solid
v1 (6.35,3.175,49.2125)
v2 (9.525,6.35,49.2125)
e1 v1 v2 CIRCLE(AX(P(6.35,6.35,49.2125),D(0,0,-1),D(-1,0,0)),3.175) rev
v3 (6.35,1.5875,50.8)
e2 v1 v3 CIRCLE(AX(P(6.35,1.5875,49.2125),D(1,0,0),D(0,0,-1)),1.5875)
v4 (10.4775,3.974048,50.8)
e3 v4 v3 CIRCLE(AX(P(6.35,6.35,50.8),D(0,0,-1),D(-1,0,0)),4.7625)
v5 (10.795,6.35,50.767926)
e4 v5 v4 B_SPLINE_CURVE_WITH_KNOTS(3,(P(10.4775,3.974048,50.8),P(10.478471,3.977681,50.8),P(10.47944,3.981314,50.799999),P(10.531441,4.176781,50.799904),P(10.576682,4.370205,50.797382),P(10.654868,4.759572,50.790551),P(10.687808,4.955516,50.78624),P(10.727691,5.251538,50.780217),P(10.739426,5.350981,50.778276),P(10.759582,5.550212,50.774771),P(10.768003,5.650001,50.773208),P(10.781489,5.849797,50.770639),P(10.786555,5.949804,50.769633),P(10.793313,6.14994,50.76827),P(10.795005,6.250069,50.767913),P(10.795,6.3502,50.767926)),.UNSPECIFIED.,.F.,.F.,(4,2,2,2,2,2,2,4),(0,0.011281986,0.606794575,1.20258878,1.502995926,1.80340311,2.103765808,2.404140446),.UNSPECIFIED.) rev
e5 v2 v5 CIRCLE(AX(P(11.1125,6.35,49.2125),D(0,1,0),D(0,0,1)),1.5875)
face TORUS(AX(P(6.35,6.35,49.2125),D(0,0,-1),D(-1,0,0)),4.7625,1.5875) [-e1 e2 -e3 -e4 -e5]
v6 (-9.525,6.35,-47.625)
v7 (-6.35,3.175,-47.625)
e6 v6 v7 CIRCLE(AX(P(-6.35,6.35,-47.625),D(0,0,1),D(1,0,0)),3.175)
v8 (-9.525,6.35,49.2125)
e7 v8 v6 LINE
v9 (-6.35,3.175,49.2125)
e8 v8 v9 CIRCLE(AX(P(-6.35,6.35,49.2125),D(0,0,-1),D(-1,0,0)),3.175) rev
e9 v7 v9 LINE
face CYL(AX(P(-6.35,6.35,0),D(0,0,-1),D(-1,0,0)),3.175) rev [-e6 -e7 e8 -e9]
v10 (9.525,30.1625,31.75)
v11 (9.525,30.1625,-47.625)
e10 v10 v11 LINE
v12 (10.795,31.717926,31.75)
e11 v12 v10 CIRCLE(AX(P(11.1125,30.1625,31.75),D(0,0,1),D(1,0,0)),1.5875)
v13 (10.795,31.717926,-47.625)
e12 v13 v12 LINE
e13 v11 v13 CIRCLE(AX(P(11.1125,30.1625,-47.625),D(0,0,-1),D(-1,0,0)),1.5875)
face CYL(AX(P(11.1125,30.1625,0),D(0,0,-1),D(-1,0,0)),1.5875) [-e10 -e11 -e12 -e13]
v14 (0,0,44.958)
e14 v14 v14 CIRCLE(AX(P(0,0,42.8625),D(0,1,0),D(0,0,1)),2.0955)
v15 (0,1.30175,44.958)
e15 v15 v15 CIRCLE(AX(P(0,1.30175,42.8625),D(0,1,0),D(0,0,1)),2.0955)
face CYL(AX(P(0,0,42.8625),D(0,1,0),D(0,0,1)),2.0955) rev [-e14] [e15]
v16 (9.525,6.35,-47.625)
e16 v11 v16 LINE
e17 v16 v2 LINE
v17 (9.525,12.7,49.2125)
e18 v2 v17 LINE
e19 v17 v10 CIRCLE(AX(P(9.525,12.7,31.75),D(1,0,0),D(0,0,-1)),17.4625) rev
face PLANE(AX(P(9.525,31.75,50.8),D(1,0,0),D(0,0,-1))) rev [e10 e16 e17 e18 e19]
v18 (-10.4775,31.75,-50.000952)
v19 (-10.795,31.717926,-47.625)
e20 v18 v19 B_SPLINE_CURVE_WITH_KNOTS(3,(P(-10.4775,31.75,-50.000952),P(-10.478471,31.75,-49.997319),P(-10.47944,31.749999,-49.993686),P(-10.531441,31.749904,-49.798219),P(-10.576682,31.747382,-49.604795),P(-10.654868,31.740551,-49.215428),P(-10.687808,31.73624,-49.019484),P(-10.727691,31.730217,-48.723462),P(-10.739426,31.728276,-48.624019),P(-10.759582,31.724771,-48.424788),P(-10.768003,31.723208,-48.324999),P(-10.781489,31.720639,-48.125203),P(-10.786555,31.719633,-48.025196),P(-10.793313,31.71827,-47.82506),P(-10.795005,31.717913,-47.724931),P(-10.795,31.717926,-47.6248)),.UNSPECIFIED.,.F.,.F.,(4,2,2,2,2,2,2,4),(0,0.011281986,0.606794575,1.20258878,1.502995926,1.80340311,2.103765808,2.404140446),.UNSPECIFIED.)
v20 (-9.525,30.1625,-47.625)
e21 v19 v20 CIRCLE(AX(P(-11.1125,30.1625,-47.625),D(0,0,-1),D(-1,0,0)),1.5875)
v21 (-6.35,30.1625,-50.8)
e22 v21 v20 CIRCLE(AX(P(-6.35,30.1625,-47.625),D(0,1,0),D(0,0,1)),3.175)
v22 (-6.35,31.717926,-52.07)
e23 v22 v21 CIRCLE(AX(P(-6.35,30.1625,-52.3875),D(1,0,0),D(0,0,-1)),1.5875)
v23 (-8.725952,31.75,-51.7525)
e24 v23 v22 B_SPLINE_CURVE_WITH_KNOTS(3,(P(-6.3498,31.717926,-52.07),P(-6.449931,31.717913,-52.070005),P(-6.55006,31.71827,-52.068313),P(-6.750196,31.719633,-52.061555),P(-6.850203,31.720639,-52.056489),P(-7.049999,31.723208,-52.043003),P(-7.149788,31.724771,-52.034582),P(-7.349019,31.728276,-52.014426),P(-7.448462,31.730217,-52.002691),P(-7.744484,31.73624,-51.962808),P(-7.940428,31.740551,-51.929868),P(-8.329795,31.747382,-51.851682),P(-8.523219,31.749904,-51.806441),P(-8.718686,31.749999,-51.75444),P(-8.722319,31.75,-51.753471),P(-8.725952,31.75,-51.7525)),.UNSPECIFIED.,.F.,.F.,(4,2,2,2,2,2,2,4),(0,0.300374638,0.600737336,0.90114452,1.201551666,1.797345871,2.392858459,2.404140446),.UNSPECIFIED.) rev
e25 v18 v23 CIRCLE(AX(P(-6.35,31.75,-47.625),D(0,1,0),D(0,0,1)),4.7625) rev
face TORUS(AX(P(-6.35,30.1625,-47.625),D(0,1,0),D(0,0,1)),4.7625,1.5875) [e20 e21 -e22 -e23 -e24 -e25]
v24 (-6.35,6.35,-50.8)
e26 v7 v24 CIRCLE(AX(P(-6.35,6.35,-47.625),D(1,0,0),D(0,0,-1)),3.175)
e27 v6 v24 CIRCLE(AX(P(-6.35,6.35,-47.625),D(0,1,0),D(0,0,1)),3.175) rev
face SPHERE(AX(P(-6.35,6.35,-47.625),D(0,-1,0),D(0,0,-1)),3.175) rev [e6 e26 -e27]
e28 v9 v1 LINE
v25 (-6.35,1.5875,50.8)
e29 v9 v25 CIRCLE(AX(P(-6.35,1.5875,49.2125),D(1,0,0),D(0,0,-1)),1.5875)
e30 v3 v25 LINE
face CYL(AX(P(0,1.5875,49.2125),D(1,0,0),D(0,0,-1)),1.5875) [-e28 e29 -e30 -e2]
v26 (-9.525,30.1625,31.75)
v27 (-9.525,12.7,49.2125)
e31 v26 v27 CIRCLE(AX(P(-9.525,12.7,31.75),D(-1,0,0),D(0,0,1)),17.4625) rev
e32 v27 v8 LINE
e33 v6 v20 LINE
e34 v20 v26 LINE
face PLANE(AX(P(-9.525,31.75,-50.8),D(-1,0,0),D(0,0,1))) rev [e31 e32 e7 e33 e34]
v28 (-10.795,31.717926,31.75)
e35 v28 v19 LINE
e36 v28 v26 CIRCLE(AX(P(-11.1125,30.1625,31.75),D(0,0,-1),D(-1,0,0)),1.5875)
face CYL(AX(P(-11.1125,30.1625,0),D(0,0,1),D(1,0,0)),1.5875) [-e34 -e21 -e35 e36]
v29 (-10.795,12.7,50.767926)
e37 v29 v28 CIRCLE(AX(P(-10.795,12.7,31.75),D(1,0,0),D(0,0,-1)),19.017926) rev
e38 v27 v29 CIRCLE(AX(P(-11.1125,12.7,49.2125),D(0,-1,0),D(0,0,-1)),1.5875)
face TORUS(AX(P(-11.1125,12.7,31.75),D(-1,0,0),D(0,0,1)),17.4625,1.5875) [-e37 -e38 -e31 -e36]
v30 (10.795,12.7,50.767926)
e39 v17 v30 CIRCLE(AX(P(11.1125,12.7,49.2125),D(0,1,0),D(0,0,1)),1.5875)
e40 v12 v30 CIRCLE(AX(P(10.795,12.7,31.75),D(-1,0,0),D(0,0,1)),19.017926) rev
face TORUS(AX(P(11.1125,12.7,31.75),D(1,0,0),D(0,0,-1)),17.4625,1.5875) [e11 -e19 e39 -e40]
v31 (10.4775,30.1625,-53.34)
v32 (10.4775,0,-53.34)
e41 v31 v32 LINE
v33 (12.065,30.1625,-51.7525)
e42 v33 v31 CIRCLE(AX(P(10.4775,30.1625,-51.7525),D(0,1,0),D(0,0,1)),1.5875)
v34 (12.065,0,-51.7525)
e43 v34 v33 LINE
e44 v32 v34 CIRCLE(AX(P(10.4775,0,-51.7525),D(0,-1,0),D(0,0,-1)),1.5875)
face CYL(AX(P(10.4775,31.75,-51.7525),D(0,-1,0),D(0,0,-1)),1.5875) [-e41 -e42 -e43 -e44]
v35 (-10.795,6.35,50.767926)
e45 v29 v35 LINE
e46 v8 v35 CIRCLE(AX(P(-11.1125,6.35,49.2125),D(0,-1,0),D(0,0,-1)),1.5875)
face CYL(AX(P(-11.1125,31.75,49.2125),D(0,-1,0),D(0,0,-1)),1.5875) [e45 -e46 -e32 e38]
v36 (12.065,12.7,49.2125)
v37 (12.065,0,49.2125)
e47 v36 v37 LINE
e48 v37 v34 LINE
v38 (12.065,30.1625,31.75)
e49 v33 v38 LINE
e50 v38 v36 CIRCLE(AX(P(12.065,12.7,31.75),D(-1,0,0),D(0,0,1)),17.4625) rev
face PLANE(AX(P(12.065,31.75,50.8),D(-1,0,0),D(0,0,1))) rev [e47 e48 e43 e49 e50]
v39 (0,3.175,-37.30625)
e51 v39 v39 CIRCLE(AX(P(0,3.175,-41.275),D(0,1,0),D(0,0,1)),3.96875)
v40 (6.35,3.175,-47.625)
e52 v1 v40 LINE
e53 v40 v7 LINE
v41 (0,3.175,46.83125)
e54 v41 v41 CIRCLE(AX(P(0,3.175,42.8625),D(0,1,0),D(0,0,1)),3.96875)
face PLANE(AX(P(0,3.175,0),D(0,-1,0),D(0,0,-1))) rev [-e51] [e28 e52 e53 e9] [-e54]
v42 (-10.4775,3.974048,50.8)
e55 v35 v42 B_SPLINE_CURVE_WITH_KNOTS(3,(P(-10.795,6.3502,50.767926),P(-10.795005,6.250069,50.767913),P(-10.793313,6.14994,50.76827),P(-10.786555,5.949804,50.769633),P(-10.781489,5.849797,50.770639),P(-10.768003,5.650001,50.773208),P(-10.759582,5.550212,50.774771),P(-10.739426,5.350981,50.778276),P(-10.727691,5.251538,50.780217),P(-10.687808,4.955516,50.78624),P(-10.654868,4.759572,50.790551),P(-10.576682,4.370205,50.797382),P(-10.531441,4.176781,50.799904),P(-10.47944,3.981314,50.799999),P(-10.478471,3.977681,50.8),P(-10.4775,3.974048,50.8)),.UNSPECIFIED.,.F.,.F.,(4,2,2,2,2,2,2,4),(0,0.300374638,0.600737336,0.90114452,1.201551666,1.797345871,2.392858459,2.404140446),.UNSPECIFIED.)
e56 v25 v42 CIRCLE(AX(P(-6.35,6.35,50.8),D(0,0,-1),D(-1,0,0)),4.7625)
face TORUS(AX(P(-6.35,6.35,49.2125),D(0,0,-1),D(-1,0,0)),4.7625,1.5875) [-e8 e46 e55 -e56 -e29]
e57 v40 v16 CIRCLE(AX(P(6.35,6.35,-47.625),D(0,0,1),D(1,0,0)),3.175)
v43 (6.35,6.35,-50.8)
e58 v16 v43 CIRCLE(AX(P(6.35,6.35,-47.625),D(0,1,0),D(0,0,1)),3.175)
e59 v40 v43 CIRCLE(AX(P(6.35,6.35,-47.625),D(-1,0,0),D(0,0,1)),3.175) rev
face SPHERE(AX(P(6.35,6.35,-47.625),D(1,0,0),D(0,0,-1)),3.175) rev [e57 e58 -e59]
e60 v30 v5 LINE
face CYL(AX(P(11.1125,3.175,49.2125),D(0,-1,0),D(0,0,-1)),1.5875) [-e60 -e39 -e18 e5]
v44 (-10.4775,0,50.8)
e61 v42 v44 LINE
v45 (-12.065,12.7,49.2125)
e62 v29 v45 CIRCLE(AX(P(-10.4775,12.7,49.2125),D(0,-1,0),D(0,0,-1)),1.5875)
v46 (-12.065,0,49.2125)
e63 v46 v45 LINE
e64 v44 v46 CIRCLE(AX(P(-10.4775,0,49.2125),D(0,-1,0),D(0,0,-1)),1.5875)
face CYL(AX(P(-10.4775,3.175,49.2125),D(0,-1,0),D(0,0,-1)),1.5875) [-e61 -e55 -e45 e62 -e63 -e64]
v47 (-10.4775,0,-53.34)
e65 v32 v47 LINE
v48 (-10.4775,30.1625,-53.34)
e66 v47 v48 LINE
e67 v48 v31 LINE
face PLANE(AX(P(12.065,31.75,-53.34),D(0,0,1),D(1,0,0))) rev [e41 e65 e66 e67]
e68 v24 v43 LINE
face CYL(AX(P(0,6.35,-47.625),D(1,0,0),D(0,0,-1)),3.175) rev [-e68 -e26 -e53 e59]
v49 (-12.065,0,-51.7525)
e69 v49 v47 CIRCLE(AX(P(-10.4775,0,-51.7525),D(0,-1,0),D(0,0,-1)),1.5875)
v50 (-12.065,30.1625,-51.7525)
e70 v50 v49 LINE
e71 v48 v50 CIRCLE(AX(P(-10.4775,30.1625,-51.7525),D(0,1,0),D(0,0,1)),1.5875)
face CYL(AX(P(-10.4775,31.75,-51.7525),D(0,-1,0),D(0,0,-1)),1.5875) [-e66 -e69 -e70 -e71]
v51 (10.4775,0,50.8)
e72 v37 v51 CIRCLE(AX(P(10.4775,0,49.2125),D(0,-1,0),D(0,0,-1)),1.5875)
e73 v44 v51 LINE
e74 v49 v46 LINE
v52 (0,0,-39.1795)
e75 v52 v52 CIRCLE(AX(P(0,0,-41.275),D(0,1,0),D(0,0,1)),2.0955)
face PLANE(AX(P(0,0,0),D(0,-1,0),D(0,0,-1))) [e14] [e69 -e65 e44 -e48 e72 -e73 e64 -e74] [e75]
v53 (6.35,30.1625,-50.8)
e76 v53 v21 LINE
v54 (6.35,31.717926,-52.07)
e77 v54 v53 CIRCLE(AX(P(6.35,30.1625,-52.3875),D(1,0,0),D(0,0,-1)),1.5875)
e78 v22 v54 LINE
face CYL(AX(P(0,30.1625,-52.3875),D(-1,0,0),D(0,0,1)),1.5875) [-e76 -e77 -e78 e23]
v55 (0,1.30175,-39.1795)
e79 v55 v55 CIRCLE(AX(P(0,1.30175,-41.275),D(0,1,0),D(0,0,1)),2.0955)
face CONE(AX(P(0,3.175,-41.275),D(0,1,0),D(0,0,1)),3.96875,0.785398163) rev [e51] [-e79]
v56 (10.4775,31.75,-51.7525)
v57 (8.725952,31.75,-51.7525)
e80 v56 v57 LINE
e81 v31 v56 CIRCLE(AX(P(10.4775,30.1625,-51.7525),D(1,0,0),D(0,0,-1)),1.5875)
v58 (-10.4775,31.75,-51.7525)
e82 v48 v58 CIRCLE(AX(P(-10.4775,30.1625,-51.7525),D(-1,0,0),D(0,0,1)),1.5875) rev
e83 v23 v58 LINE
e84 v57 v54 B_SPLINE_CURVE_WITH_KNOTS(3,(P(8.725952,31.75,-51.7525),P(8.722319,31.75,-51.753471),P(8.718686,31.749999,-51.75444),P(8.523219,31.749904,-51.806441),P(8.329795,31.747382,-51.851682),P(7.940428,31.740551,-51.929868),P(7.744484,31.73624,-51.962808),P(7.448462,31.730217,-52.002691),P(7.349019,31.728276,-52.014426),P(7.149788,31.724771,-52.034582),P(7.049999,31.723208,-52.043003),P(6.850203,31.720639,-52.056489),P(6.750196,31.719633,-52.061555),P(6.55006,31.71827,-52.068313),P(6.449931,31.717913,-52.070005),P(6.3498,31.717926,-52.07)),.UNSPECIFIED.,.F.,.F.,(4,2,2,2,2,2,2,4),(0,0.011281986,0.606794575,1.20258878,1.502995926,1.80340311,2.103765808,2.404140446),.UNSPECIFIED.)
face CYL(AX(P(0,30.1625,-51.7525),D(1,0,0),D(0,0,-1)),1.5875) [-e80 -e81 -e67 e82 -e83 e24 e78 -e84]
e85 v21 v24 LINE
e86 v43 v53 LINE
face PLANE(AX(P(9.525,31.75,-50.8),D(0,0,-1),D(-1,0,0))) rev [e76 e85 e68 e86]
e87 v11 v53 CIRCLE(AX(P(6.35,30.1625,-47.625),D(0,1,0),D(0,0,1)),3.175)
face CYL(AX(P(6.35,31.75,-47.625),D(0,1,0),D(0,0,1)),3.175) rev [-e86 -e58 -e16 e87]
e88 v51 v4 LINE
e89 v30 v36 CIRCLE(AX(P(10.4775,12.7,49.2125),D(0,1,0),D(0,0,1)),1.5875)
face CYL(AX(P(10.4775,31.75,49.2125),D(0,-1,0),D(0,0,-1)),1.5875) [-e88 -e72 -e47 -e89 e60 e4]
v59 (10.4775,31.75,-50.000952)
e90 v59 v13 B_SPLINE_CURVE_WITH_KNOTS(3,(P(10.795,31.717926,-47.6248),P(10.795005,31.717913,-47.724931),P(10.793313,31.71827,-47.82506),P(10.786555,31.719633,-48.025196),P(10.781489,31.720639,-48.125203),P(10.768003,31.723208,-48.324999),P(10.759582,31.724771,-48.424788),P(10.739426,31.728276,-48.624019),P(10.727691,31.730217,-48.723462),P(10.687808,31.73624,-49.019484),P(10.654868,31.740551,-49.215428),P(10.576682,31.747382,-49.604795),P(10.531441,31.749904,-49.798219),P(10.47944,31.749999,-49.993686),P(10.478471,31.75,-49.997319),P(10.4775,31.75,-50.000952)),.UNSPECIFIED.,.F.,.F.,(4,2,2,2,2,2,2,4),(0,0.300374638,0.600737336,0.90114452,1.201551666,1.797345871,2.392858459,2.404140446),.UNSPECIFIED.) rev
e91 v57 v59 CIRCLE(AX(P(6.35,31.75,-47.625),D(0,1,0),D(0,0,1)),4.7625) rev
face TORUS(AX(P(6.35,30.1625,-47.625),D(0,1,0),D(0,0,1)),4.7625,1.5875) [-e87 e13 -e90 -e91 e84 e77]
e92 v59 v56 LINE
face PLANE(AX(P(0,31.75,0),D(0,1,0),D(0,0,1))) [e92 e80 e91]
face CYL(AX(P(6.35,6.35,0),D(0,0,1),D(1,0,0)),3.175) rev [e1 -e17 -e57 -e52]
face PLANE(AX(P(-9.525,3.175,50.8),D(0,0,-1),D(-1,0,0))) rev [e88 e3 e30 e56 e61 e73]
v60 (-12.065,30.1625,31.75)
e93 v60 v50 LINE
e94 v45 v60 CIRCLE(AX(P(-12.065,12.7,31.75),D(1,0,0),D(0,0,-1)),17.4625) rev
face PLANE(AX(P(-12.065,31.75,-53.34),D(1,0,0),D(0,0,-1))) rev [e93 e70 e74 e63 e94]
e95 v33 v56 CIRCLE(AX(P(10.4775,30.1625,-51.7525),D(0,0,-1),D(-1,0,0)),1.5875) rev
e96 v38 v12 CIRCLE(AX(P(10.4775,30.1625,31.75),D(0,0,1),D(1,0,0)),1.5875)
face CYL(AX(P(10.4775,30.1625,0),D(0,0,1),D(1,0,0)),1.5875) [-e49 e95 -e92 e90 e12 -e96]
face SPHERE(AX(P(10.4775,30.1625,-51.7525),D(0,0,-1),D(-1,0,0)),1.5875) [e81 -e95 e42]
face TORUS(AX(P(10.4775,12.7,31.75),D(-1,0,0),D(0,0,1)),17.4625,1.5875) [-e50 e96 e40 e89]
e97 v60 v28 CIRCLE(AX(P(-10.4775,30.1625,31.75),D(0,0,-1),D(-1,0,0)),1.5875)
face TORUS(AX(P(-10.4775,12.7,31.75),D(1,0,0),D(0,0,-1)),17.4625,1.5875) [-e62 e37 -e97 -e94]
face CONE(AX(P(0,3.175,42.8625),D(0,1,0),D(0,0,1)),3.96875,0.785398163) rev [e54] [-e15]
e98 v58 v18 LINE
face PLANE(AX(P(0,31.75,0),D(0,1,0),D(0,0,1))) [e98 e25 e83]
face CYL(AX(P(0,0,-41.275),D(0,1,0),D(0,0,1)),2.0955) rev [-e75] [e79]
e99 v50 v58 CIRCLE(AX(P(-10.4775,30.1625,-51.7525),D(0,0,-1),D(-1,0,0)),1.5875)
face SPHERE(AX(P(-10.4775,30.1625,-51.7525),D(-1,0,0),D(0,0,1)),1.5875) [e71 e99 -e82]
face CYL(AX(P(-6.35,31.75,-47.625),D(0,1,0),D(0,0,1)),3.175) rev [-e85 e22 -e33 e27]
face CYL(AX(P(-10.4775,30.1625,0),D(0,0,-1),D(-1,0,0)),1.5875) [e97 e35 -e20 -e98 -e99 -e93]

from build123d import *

# Parameters (mm, degrees)
SKETCH1_W           = 19.05
SKETCH1_H           = 101.6
BOSS_EXTRUDE1_DEPTH = 3.175
BOSS_EXTRUDE2_DEPTH = 31.75
FILLET1_R           = 19.05
FILLET2_R           = 3.175
FILLET3_R           = 1.5875
SKETCH3_R           = 2.0955
CUT_EXTRUDE1_DEPTH  = 62.702921072


with BuildPart() as part:
    # Sketch1 → Boss-Extrude1 (new body)
    with BuildSketch(Plane(origin=(0, 0, 0), x_dir=(1, 0, 0), z_dir=(0, 1, 0))):
        Rectangle(SKETCH1_W, SKETCH1_H)
    extrude(amount=BOSS_EXTRUDE1_DEPTH)

    # Sketch2 → Boss-Extrude2 (add)
    with BuildSketch(Plane(origin=(0, 0, 0), x_dir=(1, 0, 0), z_dir=(0, 1, 0))):
        Polygon((-12.065, 53.34), (-12.065, -50.8), (-9.525, -50.8), (-9.525, 50.8), (9.525, 50.8), (9.525, -50.8), (12.065, -50.8), (12.065, 53.34), align=None)
    extrude(amount=BOSS_EXTRUDE2_DEPTH)

    # Fillet1
    fillet1_edges = [part.edges().sort_by_distance(p)[0] for p in [
        (10.795, 31.75, 50.8),
        (-10.795, 31.75, 50.8),
    ]]
    fillet(fillet1_edges, radius=FILLET1_R)

    # Fillet2
    fillet2_edges = [part.edges().sort_by_distance(p)[0] for p in [
        (-9.525, 3.175, 0),
        (-9.525, 17.4625, -50.8),
        (9.525, 17.4625, -50.8),
        (9.525, 3.175, 0),
        (0, 3.175, -50.8),
    ]]
    fillet(fillet2_edges, radius=FILLET2_R)

    # Fillet3
    # the kernel refuses this fillet: 1.5875 mm, written as the material it takes off along each edge
    with BuildSketch(Plane(origin=(-10.4775, 30.1625, -51.7525), x_dir=(-1, 0, 0), z_dir=(0, 1, 0))) as fillet3_piece_1_section:
        Polygon((0, 0), (FILLET3_R, 0), (FILLET3_R, -FILLET3_R), (0, -FILLET3_R), align=None)
    fillet3_piece_1 = extrude(amount=FILLET3_R, mode=Mode.PRIVATE)
    fillet3_piece_1 = fillet3_piece_1 - Plane(origin=(-10.4775, 30.1625, -51.7525), x_dir=(0.7071067811865475, 0, 0.7071067811865475), z_dir=(0, 1, 0)) * Sphere(FILLET3_R, mode=Mode.PRIVATE)
    add(fillet3_piece_1, mode=Mode.SUBTRACT)
    with BuildSketch(Plane(origin=(10.4775, 30.1625, -51.7525), x_dir=(0, 1, 0), z_dir=(1, 0, 0))) as fillet3_piece_2_section:
        Polygon((0, 0), (FILLET3_R, 0), (FILLET3_R, -FILLET3_R), (0, -FILLET3_R), align=None)
    fillet3_piece_2 = extrude(amount=FILLET3_R, mode=Mode.PRIVATE)
    fillet3_piece_2 = fillet3_piece_2 - Plane(origin=(10.4775, 30.1625, -51.7525), x_dir=(0, -0.7071067811865475, 0.7071067811865475), z_dir=(1, 0, 0)) * Sphere(FILLET3_R, mode=Mode.PRIVATE)
    add(fillet3_piece_2, mode=Mode.SUBTRACT)
    with BuildSketch(Plane(origin=(12.065, 12.7, 31.75), x_dir=(0, 0, 1), z_dir=(0, -1, 0))) as fillet3_piece_3:
        with BuildLine():
            CenterArc((19.05 - FILLET3_R, FILLET3_R), FILLET3_R, 270, 90)
            Line((19.05, FILLET3_R), (19.05, 0))
            Line((19.05, 0), (19.05 - FILLET3_R, 0))
        make_face()
    revolve(axis=Axis((12.065, 12.7, 31.75), (-1, 0, 0)), revolution_arc=90, mode=Mode.SUBTRACT)
    with BuildSketch(Plane(origin=(-12.065, 12.7, 31.75), x_dir=(0, 0, 1), z_dir=(0, -1, 0))) as fillet3_piece_4:
        with BuildLine():
            CenterArc((19.05 - FILLET3_R, -FILLET3_R), FILLET3_R, 0, 90)
            Line((19.05 - FILLET3_R, 0), (19.05, 0))
            Line((19.05, 0), (19.05, -FILLET3_R))
        make_face()
    revolve(axis=Axis((-12.065, 12.7, 31.75), (-1, 0, 0)), revolution_arc=90, mode=Mode.SUBTRACT)
    with BuildSketch(Plane(origin=(-9.525, 12.7, 31.75), x_dir=(0, 0, 1), z_dir=(0, -1, 0))) as fillet3_piece_5:
        with BuildLine():
            CenterArc((19.05 - FILLET3_R, FILLET3_R), FILLET3_R, 270, 90)
            Line((19.05, FILLET3_R), (19.05, 0))
            Line((19.05, 0), (19.05 - FILLET3_R, 0))
        make_face()
    revolve(axis=Axis((-9.525, 12.7, 31.75), (-1, 0, 0)), revolution_arc=90, mode=Mode.SUBTRACT)
    with BuildSketch(Plane(origin=(9.525, 12.7, 31.75), x_dir=(0, 0, 1), z_dir=(0, -1, 0))) as fillet3_piece_6:
        with BuildLine():
            CenterArc((19.05 - FILLET3_R, -FILLET3_R), FILLET3_R, 0, 90)
            Line((19.05, -FILLET3_R), (19.05, 0))
            Line((19.05, 0), (19.05 - FILLET3_R, 0))
        make_face()
    revolve(axis=Axis((9.525, 12.7, 31.75), (-1, 0, 0)), revolution_arc=90, mode=Mode.SUBTRACT)
    with BuildSketch(Plane(origin=(9.525, 6.35, 50.8), x_dir=(1, 0, 0), z_dir=(0, 1, 0))) as fillet3_piece_7:
        with BuildLine():
            CenterArc((FILLET3_R, FILLET3_R), FILLET3_R, 180, 90)
            Line((0, FILLET3_R), (0, 0))
            Line((0, 0), (FILLET3_R, 0))
        make_face()
    extrude(amount=6.35, mode=Mode.SUBTRACT)
    with BuildSketch(Plane(origin=(6.35, 6.35, 50.8), x_dir=(0, -1, 0), z_dir=(-1, 0, 0))) as fillet3_piece_8:
        with BuildLine():
            CenterArc((3.175 + FILLET3_R, -FILLET3_R), FILLET3_R, 90, 90)
            Line((3.175, -FILLET3_R), (3.175, 0))
            Line((3.175, 0), (3.175 + FILLET3_R, 0))
        make_face()
    revolve(axis=Axis((6.35, 6.35, 50.8), (0, 0, 1)), revolution_arc=90, mode=Mode.SUBTRACT)
    with BuildSketch(Plane(origin=(-6.35, 3.175, 50.8), x_dir=(0, -1, 0), z_dir=(1, 0, 0))) as fillet3_piece_9:
        with BuildLine():
            CenterArc((FILLET3_R, FILLET3_R), FILLET3_R, 180, 90)
            Line((0, FILLET3_R), (0, 0))
            Line((0, 0), (FILLET3_R, 0))
        make_face()
    extrude(amount=12.7, mode=Mode.SUBTRACT)
    with BuildSketch(Plane(origin=(-6.35, 6.35, 50.8), x_dir=(-1, 0, 0), z_dir=(0, 1, 0))) as fillet3_piece_10:
        with BuildLine():
            CenterArc((3.175 + FILLET3_R, -FILLET3_R), FILLET3_R, 90, 90)
            Line((3.175, -FILLET3_R), (3.175, 0))
            Line((3.175, 0), (3.175 + FILLET3_R, 0))
        make_face()
    revolve(axis=Axis((-6.35, 6.35, 50.8), (0, 0, 1)), revolution_arc=90, mode=Mode.SUBTRACT)
    with BuildSketch(Plane(origin=(-6.35, 31.75, -47.625), x_dir=(-1, 0, 0), z_dir=(0, 0, 1))) as fillet3_piece_11:
        with BuildLine():
            CenterArc((3.175 + FILLET3_R, FILLET3_R), FILLET3_R, 180, 90)
            Line((3.175, FILLET3_R), (3.175, 0))
            Line((3.175, 0), (3.175 + FILLET3_R, 0))
        make_face()
    revolve(axis=Axis((-6.35, 31.75, -47.625), (0, -1, 0)), revolution_arc=90, mode=Mode.SUBTRACT)
    with BuildSketch(Plane(origin=(-9.525, 31.75, 31.75), x_dir=(0, -1, 0), z_dir=(0, 0, -1)), Plane(origin=(9.525, 31.75, -47.625), x_dir=(0, -1, 0), z_dir=(0, 0, 1))) as fillet3_piece_12:
        with BuildLine():
            CenterArc((FILLET3_R, FILLET3_R), FILLET3_R, 180, 90)
            Line((0, FILLET3_R), (0, 0))
            Line((0, 0), (FILLET3_R, 0))
        make_face()
    extrude(amount=79.375, mode=Mode.SUBTRACT)
    with BuildSketch(Plane(origin=(-12.065, 31.75, -51.7525), x_dir=(0, -1, 0), z_dir=(0, 0, 1)), Plane(origin=(12.065, 31.75, 31.75), x_dir=(0, -1, 0), z_dir=(0, 0, -1))) as fillet3_piece_13:
        with BuildLine():
            CenterArc((FILLET3_R, FILLET3_R), FILLET3_R, 180, 90)
            Line((0, FILLET3_R), (0, 0))
            Line((0, 0), (FILLET3_R, 0))
        make_face()
    extrude(amount=83.5025, mode=Mode.SUBTRACT)
    with BuildSketch(Plane(origin=(10.4775, 31.75, -53.34), x_dir=(0, 0, 1), z_dir=(-1, 0, 0))) as fillet3_piece_14:
        with BuildLine():
            CenterArc((FILLET3_R, -FILLET3_R), FILLET3_R, 90, 90)
            Line((0, -FILLET3_R), (0, 0))
            Line((0, 0), (FILLET3_R, 0))
        make_face()
    extrude(amount=20.955, mode=Mode.SUBTRACT)
    with BuildSketch(Plane(origin=(6.35, 31.75, -47.625), x_dir=(1, 0, 0), z_dir=(0, 0, 1))) as fillet3_piece_15:
        with BuildLine():
            CenterArc((3.175 + FILLET3_R, -FILLET3_R), FILLET3_R, 90, 90)
            Line((3.175, -FILLET3_R), (3.175, 0))
            Line((3.175, 0), (3.175 + FILLET3_R, 0))
        make_face()
    revolve(axis=Axis((6.35, 31.75, -47.625), (0, 1, 0)), revolution_arc=90, mode=Mode.SUBTRACT)
    with BuildSketch(Plane(origin=(-6.35, 31.75, -50.8), x_dir=(0, 0, -1), z_dir=(1, 0, 0))) as fillet3_piece_16:
        with BuildLine():
            CenterArc((FILLET3_R, -FILLET3_R), FILLET3_R, 90, 90)
            Line((0, -FILLET3_R), (0, 0))
            Line((0, 0), (FILLET3_R, 0))
        make_face()
    extrude(amount=12.7, mode=Mode.SUBTRACT)
    with BuildSketch(Plane(origin=(-12.065, -3.96875, -53.34), x_dir=(0, 0, 1), z_dir=(0, 1, 0))) as fillet3_piece_17:
        with BuildLine():
            CenterArc((FILLET3_R, FILLET3_R), FILLET3_R, 180, 90)
            Line((0, FILLET3_R), (0, 0))
            Line((0, 0), (FILLET3_R, 0))
        make_face()
    extrude(amount=34.13125, mode=Mode.SUBTRACT)
    with BuildSketch(Plane(origin=(12.065, -3.96875, -53.34), x_dir=(0, 0, 1), z_dir=(0, 1, 0))) as fillet3_piece_18:
        with BuildLine():
            CenterArc((FILLET3_R, -FILLET3_R), FILLET3_R, 90, 90)
            Line((0, -FILLET3_R), (0, 0))
            Line((0, 0), (FILLET3_R, 0))
        make_face()
    extrude(amount=34.13125, mode=Mode.SUBTRACT)
    with BuildSketch(Plane(origin=(12.065, -3.96875, 50.8), x_dir=(-1, 0, 0), z_dir=(0, 1, 0))) as fillet3_piece_19:
        with BuildLine():
            CenterArc((FILLET3_R, -FILLET3_R), FILLET3_R, 90, 90)
            Line((0, -FILLET3_R), (0, 0))
            Line((0, 0), (FILLET3_R, 0))
        make_face()
    extrude(amount=16.66875, mode=Mode.SUBTRACT)
    with BuildSketch(Plane(origin=(-12.065, -3.96875, 50.8), x_dir=(1, 0, 0), z_dir=(0, 1, 0))) as fillet3_piece_20:
        with BuildLine():
            CenterArc((FILLET3_R, FILLET3_R), FILLET3_R, 180, 90)
            Line((0, FILLET3_R), (0, 0))
            Line((0, 0), (FILLET3_R, 0))
        make_face()
    extrude(amount=16.66875, mode=Mode.SUBTRACT)
    with BuildSketch(Plane(origin=(-9.525, 6.35, 50.8), x_dir=(-1, 0, 0), z_dir=(0, 1, 0))) as fillet3_piece_21:
        with BuildLine():
            CenterArc((FILLET3_R, -FILLET3_R), FILLET3_R, 90, 90)
            Line((0, -FILLET3_R), (0, 0))
            Line((0, 0), (FILLET3_R, 0))
        make_face()
    extrude(amount=6.35, mode=Mode.SUBTRACT)

    # Sketch3 → Cut-Extrude1 (cut, through all)
    with BuildSketch(Plane(origin=(0, 3.175, 0), x_dir=(1, 0, 0), z_dir=(0, 1, 0))):
        with Locations(Location((0, 41.275, 0), (0, 0, 270))):
            Circle(SKETCH3_R)
        with Locations(Location((0, -42.8625, 0), (0, 0, 270))):
            Circle(SKETCH3_R)
    extrude(amount=-CUT_EXTRUDE1_DEPTH, mode=Mode.SUBTRACT)

    # Cut-Extrude2 cone 1 section (through the dimple's axis) → Cut-Extrude2 (revolve, cut)
    with BuildSketch(Plane(origin=(0, 3.175, -41.275), x_dir=(0, 0, 1), z_dir=(1, 0, 0))):
        Polygon((0, 0), (3.96875, 0), (0, 3.96875), align=None)
    revolve(axis=Axis((0, 3.175, -41.275), (0, -1, 0)), mode=Mode.SUBTRACT)

    # Cut-Extrude2 cone 2 section (through the dimple's axis) → Cut-Extrude2 cone 2 (revolve, cut)
    with BuildSketch(Plane(origin=(0, 3.175, 42.8625), x_dir=(0, 0, 1), z_dir=(1, 0, 0))):
        Polygon((0, 0), (3.96875, 0), (0, 3.96875), align=None)
    revolve(axis=Axis((0, 3.175, 42.8625), (0, -1, 0)), mode=Mode.SUBTRACT)


solid = part.part
